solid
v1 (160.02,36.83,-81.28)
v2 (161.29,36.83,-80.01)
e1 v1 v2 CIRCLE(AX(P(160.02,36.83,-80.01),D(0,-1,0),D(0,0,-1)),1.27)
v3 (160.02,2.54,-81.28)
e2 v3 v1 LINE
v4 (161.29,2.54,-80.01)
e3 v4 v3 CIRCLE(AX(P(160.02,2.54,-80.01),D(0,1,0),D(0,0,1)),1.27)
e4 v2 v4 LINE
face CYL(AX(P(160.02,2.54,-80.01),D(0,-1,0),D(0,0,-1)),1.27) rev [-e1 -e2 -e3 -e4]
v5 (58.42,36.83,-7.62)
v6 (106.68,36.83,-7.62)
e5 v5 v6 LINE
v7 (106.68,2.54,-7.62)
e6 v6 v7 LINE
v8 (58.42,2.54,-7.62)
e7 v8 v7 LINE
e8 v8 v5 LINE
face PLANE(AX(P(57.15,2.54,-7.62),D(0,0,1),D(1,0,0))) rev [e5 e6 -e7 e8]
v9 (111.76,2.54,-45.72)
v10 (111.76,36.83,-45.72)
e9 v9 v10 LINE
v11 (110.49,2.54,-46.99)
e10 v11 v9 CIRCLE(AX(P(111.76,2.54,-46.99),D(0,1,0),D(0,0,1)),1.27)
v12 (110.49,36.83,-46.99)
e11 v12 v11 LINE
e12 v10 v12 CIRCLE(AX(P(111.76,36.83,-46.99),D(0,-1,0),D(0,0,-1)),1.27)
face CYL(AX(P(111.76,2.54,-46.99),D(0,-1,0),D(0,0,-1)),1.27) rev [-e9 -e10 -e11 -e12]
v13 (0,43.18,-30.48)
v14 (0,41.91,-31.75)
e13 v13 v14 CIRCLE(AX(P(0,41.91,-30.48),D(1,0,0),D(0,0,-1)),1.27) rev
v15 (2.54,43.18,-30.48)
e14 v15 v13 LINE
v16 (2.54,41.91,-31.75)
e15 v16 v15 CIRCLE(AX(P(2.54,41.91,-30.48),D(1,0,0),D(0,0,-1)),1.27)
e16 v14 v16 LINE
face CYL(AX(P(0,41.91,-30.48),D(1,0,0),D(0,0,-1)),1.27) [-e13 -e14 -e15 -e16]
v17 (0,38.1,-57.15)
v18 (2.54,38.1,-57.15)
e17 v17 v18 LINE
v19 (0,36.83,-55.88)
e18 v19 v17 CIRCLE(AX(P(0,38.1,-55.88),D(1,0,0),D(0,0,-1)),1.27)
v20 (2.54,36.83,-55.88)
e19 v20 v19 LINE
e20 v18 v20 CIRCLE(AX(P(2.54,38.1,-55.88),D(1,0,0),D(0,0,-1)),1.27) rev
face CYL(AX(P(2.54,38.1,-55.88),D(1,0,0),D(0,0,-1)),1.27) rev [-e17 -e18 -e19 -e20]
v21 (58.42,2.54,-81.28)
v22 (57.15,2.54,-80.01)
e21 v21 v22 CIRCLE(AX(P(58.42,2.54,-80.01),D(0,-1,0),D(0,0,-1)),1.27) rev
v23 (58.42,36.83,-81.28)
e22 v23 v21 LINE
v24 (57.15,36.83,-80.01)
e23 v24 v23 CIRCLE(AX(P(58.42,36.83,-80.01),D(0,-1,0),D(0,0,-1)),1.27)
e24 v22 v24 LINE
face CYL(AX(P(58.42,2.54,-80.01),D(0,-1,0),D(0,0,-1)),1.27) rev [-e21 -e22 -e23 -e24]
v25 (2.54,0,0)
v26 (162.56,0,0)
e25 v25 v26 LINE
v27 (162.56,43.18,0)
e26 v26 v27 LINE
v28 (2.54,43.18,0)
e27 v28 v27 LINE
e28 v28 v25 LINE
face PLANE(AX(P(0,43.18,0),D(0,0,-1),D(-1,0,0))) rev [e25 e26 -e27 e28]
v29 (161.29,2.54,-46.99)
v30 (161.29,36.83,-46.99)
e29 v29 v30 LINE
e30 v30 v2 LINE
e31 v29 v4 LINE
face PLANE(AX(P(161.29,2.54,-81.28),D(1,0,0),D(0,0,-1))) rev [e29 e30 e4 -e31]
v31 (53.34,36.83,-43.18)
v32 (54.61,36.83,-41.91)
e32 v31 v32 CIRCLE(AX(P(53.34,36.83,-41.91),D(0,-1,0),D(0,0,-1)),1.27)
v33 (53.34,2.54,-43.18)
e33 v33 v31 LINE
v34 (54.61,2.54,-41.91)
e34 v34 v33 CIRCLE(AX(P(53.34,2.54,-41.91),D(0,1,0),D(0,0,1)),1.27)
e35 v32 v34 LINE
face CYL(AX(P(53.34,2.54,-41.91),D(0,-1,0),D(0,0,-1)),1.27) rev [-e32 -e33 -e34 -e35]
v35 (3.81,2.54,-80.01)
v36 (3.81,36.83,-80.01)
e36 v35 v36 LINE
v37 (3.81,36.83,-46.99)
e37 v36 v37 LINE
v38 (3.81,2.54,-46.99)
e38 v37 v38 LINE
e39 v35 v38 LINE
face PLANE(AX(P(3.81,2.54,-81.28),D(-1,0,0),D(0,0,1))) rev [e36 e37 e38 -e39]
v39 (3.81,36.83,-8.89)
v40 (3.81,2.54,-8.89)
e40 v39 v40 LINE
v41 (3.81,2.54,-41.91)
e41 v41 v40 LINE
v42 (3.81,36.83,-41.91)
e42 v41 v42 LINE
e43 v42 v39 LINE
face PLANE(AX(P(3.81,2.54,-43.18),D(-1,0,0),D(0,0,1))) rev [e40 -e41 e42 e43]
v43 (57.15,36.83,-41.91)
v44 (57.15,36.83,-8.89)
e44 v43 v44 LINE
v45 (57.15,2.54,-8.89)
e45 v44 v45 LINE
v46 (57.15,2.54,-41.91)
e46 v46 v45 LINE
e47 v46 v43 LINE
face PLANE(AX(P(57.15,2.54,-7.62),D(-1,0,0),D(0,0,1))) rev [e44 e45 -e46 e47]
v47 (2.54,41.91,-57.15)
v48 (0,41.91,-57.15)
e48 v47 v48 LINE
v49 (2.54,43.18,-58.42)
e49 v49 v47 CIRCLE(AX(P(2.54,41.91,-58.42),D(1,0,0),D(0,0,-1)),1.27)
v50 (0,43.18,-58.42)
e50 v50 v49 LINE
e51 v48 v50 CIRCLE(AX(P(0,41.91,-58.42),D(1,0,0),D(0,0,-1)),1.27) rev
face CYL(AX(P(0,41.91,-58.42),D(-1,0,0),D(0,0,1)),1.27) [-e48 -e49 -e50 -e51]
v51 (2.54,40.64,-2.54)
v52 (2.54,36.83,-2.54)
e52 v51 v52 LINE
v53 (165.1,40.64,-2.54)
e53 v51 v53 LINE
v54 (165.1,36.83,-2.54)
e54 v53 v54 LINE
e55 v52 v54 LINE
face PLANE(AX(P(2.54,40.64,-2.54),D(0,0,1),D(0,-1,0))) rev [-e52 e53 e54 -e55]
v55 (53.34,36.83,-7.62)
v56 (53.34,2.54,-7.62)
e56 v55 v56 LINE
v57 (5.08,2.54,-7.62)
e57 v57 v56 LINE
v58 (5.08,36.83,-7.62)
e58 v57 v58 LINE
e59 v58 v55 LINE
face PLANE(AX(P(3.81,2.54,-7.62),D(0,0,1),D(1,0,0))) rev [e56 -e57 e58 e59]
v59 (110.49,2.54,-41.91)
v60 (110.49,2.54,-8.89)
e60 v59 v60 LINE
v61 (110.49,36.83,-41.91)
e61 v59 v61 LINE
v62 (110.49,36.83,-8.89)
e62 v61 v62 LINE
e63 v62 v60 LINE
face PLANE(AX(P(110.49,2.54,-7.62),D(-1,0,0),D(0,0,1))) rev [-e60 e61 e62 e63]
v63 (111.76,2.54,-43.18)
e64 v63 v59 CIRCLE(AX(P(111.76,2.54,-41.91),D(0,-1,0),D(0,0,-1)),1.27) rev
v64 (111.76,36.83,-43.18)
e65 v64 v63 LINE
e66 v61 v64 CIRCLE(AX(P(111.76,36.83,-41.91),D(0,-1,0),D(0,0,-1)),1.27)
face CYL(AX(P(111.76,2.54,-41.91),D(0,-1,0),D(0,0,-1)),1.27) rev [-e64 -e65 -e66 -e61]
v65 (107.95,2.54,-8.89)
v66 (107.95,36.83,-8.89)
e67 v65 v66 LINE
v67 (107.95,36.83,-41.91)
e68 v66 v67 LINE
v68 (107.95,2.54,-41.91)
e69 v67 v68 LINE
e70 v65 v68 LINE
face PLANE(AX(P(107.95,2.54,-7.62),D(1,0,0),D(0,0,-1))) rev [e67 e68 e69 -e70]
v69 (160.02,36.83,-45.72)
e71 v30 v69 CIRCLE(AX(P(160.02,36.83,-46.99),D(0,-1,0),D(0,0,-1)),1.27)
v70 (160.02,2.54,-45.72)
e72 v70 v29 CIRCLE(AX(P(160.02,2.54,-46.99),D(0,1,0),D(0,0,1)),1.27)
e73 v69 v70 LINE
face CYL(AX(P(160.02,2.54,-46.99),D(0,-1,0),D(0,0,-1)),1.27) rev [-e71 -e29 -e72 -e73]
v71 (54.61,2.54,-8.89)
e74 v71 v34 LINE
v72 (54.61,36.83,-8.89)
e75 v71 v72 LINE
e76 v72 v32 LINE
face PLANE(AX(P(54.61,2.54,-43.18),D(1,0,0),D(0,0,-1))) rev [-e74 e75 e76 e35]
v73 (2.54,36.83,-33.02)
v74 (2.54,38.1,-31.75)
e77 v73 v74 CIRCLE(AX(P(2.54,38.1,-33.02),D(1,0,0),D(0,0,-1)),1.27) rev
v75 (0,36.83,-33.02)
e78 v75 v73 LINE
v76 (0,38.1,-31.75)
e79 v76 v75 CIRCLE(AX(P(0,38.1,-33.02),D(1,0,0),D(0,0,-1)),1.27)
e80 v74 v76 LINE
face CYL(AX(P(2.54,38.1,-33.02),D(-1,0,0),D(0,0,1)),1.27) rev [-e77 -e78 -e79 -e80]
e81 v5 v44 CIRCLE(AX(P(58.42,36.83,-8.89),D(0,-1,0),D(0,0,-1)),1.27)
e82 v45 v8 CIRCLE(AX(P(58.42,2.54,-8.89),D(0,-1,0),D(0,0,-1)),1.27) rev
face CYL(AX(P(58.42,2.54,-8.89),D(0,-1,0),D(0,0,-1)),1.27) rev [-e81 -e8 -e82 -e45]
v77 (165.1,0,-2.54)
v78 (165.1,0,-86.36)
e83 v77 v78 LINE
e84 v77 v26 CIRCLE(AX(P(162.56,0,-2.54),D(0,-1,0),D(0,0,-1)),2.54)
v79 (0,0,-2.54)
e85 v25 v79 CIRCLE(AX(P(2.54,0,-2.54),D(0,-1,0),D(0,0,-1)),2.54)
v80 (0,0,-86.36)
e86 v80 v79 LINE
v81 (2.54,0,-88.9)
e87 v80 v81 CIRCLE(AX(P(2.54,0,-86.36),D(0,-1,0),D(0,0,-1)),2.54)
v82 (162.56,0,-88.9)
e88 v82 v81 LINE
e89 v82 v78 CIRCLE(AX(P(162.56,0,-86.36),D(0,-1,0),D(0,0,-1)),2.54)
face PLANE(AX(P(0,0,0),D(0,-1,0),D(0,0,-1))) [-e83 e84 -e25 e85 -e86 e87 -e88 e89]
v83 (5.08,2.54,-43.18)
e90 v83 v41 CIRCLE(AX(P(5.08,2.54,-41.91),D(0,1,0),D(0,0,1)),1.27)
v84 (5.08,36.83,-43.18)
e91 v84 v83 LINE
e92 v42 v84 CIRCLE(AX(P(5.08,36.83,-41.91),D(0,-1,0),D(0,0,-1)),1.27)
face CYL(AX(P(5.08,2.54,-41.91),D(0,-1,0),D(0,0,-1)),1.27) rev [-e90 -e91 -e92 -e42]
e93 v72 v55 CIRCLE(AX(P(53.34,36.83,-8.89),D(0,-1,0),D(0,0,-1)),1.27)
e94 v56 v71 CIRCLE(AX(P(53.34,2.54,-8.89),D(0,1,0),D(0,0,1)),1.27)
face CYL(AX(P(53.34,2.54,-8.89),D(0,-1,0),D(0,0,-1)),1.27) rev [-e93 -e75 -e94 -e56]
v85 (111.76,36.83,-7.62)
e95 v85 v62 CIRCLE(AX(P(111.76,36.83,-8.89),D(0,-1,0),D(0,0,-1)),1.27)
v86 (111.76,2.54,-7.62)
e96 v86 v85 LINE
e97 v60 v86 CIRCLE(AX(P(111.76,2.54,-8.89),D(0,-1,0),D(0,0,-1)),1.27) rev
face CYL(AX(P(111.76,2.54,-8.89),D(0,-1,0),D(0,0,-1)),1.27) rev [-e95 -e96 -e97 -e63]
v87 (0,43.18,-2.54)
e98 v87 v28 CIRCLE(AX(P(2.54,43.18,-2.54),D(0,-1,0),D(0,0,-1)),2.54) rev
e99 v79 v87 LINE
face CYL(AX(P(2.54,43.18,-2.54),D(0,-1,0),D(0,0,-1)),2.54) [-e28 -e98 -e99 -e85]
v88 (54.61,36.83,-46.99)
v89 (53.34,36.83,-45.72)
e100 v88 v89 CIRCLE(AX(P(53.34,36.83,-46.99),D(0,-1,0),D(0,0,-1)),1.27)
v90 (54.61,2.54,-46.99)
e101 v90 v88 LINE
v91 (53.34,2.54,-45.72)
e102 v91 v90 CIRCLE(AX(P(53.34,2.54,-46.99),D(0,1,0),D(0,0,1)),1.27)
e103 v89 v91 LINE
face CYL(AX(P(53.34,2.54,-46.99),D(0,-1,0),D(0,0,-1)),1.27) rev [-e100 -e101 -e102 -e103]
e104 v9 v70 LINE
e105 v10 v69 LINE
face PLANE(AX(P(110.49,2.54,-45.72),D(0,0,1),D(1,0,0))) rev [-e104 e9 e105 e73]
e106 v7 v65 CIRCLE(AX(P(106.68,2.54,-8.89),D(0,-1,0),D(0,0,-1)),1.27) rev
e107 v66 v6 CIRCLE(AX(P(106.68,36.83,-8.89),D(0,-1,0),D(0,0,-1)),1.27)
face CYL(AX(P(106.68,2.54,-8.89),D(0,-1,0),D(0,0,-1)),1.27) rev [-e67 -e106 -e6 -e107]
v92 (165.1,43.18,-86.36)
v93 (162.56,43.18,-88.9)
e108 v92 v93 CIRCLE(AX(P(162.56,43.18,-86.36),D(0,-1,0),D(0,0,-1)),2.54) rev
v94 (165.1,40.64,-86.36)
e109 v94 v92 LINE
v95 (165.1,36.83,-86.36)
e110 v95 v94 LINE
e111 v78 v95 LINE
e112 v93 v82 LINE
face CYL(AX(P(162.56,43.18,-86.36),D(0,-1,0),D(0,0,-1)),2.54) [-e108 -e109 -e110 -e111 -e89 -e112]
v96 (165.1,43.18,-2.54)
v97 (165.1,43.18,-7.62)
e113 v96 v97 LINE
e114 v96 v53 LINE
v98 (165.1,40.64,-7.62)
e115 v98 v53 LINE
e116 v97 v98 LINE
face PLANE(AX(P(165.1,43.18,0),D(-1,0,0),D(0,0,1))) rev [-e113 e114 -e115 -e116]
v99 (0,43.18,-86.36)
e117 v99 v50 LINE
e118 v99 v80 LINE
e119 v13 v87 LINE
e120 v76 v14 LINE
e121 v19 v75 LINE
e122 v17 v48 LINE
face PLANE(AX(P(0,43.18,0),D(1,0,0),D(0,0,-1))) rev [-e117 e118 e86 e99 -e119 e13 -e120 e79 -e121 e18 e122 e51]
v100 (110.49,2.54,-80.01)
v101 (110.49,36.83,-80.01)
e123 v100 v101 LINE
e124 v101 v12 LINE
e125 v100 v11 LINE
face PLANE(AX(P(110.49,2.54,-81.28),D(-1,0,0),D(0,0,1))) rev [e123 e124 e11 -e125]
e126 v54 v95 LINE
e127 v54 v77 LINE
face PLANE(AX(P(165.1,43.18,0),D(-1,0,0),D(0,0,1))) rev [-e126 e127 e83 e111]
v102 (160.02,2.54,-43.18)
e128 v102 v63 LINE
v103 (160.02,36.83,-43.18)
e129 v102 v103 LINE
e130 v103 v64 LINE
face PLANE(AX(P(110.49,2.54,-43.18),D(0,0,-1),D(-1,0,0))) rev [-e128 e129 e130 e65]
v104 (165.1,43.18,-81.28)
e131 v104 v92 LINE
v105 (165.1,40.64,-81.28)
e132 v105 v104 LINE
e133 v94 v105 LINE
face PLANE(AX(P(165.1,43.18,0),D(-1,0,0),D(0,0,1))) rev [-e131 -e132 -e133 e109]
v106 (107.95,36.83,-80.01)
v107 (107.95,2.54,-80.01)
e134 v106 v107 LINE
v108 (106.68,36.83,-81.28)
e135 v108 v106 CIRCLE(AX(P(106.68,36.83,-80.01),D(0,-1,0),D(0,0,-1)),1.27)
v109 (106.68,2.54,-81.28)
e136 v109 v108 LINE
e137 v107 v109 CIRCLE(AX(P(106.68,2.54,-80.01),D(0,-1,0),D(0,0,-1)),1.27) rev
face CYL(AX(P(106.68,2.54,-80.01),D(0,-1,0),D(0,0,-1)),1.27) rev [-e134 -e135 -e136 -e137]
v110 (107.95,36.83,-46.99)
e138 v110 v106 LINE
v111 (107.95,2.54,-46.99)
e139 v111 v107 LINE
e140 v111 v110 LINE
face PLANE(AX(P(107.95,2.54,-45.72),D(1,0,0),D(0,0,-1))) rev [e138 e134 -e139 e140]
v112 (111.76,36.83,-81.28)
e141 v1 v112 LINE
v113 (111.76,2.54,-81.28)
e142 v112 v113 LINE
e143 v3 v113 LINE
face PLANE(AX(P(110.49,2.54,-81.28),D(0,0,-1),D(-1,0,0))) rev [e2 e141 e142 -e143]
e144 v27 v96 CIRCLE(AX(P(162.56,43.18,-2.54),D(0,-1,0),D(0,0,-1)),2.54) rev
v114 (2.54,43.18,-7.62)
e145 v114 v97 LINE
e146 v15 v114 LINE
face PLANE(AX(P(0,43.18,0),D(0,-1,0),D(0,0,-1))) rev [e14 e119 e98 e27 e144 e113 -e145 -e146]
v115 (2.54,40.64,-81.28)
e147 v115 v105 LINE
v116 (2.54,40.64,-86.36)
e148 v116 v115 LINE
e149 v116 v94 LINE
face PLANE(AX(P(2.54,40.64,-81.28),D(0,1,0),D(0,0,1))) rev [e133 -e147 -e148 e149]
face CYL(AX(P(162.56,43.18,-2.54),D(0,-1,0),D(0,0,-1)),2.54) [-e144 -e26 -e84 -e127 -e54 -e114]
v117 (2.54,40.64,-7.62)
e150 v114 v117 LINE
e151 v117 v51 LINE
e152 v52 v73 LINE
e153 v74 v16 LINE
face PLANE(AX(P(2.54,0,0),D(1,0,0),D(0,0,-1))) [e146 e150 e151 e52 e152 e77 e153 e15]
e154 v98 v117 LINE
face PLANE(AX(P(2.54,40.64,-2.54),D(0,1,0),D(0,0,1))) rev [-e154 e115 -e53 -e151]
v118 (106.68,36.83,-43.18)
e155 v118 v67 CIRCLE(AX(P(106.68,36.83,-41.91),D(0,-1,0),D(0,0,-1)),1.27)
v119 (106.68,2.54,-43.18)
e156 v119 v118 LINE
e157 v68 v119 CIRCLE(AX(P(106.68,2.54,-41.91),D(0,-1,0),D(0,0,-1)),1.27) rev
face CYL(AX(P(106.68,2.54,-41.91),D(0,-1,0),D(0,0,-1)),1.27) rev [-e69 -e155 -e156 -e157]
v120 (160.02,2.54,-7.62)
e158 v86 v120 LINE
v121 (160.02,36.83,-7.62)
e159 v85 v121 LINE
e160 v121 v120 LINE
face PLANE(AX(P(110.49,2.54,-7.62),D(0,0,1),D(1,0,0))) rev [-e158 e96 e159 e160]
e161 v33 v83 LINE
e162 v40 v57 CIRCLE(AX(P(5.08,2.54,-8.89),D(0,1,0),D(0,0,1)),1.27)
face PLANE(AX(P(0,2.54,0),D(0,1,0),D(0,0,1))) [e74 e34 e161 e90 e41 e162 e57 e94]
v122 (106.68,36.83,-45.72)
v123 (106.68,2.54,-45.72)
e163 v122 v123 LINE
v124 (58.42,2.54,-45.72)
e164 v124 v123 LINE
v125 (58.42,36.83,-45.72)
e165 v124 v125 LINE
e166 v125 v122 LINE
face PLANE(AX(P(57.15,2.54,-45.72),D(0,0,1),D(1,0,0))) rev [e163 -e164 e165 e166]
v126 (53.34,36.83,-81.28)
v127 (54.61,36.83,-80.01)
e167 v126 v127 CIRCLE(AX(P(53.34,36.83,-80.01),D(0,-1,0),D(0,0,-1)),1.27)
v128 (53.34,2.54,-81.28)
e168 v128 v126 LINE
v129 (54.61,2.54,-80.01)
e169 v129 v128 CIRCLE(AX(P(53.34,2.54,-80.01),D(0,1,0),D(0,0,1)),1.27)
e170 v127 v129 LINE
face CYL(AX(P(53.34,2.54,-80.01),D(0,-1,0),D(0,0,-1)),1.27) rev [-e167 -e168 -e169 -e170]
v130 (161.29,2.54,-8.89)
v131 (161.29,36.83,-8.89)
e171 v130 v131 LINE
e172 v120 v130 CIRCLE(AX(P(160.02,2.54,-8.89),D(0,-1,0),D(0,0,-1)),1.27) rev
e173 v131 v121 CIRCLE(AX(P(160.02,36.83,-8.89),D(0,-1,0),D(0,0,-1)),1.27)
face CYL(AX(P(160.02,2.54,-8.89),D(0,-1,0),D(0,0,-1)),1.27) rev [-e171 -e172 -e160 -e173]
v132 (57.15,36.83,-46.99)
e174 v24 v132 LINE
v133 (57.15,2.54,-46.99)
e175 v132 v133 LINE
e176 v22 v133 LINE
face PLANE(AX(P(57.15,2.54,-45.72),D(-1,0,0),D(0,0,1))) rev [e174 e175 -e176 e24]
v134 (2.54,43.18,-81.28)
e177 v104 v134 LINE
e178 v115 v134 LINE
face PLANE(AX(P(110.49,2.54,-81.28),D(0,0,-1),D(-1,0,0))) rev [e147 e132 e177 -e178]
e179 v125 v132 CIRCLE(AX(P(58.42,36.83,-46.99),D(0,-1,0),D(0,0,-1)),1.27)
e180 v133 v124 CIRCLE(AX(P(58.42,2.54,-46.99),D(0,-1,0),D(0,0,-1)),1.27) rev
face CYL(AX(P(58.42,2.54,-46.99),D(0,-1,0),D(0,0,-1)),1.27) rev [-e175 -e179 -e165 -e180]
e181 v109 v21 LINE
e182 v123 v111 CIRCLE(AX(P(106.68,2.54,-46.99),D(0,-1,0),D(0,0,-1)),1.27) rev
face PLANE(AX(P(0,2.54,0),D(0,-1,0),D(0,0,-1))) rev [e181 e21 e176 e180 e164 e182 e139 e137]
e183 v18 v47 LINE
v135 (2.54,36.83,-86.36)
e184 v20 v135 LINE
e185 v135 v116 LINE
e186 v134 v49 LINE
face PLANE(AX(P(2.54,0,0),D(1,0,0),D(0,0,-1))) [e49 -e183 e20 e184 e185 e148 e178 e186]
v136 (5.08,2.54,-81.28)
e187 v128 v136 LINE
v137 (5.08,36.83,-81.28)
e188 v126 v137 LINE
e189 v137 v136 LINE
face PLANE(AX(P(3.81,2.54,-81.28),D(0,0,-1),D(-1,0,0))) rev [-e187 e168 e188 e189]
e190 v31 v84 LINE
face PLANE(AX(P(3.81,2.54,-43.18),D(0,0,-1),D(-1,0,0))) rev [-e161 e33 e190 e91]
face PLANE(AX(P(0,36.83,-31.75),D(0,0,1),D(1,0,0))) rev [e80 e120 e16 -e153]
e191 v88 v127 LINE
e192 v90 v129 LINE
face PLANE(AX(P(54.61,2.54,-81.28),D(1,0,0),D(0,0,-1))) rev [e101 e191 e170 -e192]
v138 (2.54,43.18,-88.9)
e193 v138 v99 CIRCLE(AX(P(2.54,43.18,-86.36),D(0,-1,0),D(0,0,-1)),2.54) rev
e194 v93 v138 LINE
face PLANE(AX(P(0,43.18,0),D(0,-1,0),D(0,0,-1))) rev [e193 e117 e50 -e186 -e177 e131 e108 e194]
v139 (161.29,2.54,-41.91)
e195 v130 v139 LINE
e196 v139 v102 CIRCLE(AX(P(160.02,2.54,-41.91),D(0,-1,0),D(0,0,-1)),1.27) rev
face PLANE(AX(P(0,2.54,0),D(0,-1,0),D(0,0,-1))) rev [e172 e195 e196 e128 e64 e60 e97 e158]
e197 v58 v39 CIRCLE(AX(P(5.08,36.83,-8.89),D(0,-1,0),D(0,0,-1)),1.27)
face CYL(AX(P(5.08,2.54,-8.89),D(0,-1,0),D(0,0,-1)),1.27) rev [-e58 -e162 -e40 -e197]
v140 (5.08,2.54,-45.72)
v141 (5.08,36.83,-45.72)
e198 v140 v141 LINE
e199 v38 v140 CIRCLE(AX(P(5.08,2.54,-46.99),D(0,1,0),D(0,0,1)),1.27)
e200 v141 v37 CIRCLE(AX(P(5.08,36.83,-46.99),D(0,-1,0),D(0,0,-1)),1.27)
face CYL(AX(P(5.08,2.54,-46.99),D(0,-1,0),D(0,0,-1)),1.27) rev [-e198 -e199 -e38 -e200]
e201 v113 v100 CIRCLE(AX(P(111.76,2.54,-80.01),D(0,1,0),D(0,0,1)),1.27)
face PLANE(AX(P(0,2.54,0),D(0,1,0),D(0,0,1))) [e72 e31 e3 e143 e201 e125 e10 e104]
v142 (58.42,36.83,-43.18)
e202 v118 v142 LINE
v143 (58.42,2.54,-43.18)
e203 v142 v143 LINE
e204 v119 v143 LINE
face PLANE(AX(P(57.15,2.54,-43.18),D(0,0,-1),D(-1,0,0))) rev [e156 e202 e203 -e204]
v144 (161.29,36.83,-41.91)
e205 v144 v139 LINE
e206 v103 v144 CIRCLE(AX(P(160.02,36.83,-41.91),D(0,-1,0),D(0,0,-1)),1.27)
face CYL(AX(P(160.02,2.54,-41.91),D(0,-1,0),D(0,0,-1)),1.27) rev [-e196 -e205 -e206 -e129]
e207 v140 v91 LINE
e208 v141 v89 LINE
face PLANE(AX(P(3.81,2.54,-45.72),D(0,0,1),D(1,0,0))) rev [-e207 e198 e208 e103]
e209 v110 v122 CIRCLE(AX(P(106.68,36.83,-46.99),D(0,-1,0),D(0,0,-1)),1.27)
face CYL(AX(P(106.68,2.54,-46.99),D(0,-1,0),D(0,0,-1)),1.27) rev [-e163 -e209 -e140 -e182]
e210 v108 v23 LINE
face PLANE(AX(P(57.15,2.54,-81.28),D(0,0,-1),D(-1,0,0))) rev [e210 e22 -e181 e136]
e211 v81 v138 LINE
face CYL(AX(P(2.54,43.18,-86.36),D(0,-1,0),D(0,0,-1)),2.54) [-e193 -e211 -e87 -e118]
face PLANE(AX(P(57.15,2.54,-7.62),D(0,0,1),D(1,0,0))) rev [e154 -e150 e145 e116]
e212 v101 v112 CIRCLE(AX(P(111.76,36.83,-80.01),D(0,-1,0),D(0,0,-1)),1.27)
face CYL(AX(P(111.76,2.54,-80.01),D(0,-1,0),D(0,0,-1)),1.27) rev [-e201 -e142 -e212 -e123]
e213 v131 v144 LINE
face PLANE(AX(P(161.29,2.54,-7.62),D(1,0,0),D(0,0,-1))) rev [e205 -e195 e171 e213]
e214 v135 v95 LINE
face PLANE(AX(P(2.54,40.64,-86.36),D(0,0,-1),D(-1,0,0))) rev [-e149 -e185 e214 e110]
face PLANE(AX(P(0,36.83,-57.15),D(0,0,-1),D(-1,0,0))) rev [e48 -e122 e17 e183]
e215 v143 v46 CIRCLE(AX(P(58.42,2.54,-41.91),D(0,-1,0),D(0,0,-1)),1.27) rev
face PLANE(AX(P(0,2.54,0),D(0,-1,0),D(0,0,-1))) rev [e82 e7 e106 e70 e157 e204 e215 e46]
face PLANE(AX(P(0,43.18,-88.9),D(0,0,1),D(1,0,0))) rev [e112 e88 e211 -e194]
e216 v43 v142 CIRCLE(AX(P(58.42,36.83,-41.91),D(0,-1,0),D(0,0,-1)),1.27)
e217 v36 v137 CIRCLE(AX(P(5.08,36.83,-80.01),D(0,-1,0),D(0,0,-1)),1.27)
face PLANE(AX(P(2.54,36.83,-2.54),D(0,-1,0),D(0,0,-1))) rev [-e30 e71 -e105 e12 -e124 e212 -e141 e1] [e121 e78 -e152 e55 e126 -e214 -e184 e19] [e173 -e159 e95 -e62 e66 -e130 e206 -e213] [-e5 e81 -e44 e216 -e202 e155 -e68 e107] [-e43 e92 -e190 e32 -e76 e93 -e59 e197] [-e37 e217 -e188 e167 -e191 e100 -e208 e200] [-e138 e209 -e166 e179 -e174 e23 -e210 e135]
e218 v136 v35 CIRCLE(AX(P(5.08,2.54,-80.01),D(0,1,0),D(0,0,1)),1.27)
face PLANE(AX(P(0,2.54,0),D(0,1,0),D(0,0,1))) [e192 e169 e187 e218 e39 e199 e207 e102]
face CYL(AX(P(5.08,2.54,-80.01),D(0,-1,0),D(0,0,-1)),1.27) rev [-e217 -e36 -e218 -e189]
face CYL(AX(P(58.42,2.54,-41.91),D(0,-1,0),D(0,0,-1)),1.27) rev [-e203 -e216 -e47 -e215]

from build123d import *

# Parameters (mm, degrees)
SKETCH1_W           = 165.1
SKETCH1_H           = 88.9
BOSS_EXTRUDE1_DEPTH = 43.18
SKETCH2_W           = 50.8
SKETCH2_H           = 35.56
CUT_EXTRUDE1_DEPTH  = 40.64
CUT_EXTRUDE2_DEPTH  = 162.56
SKETCH4_W           = 2.54
SKETCH4_H           = 25.4
CUT_EXTRUDE3_DEPTH  = 6.35
FILLET1_START       = -1
FILLET1_DEPTH       = 45
FILLET2_R           = 1.27


with BuildPart() as part:
    # Sketch1 → Boss-Extrude1 (new body)
    with BuildSketch(Plane(origin=(0, 0, 0), x_dir=(1, 0, 0), z_dir=(0, 1, 0))):
        with Locations((82.55, 44.45)):
            Rectangle(SKETCH1_W, SKETCH1_H)
    extrude(amount=BOSS_EXTRUDE1_DEPTH)

    # Sketch2 → Cut-Extrude1 (cut)
    with BuildSketch(Plane(origin=(0, 43.18, 0), x_dir=(1, 0, 0), z_dir=(0, 1, 0))):
        with Locations((29.21, 63.5)):
            Rectangle(SKETCH2_W, SKETCH2_H)
        with Locations((29.21, 25.4)):
            Rectangle(SKETCH2_W, SKETCH2_H)
        with Locations((82.55, 63.5)):
            Rectangle(SKETCH2_W, SKETCH2_H)
        with Locations((135.89, 63.5)):
            Rectangle(SKETCH2_W, SKETCH2_H)
        with Locations((135.89, 25.4)):
            Rectangle(SKETCH2_W, SKETCH2_H)
        with Locations((82.55, 25.4)):
            Rectangle(SKETCH2_W, SKETCH2_H)
    extrude(amount=-CUT_EXTRUDE1_DEPTH, mode=Mode.SUBTRACT)

    # Sketch3 → Cut-Extrude2 (cut)
    with BuildSketch(Plane(origin=(165.1, 0, 0), x_dir=(0, 0, -1), z_dir=(1, 0, 0))):
        Polygon((2.54, 40.64), (7.62, 40.64), (7.62, 43.18), (81.28, 43.18), (81.28, 40.64), (86.36, 40.64), (86.36, 36.83), (2.54, 36.83), align=None)
    extrude(amount=-CUT_EXTRUDE2_DEPTH, mode=Mode.SUBTRACT)

    # Sketch4 → Cut-Extrude3 (cut)
    with BuildSketch(Plane(origin=(0, 43.18, 0), x_dir=(1, 0, 0), z_dir=(0, 1, 0))):
        with Locations((1.27, 44.45)):
            Rectangle(SKETCH4_W, SKETCH4_H)
    extrude(amount=-CUT_EXTRUDE3_DEPTH, mode=Mode.SUBTRACT)

    # Fillet1: read off the stored shape, not the designer's step
    # Fillet1 outline → Fillet1 (cut)
    with BuildSketch(Plane(origin=(0, 0, 0), x_dir=(1, 0, 0), z_dir=(0, 1, 0)).offset(FILLET1_START)):
        with BuildLine():
            Line((0, 88.9), (0, 86.36))
            ThreePointArc((0, 86.36), (0.743948776, 88.156051224), (2.54, 88.9))
            Line((2.54, 88.9), (0, 88.9))
        make_face()
        with BuildLine():
            ThreePointArc((2.54, 0), (0.743948776, 0.743948776), (0, 2.54))
            Line((0, 2.54), (0, 0))
            Line((0, 0), (2.54, 0))
        make_face()
        with BuildLine():
            Line((165.1, 88.9), (162.56, 88.9))
            ThreePointArc((162.56, 88.9), (164.356051224, 88.156051224), (165.1, 86.36))
            Line((165.1, 86.36), (165.1, 88.9))
        make_face()
        with BuildLine():
            ThreePointArc((165.1, 2.54), (164.356051224, 0.743948776), (162.56, 0))
            Line((162.56, 0), (165.1, 0))
            Line((165.1, 0), (165.1, 2.54))
        make_face()
    extrude(amount=FILLET1_DEPTH, mode=Mode.SUBTRACT)

    # Fillet2
    fillet2_edges = [part.edges().sort_by_distance(p)[0] for p in [
        (1.27, 36.83, -57.15),
        (1.27, 36.83, -31.75),
        (1.27, 43.18, -31.75),
        (1.27, 43.18, -57.15),
        (57.15, 19.685, -7.62),
        (57.15, 19.685, -43.18),
        (107.95, 19.685, -43.18),
        (107.95, 19.685, -7.62),
        (110.49, 19.685, -45.72),
        (110.49, 19.685, -81.28),
        (161.29, 19.685, -81.28),
        (161.29, 19.685, -45.72),
        (57.15, 19.685, -45.72),
        (57.15, 19.685, -81.28),
        (107.95, 19.685, -81.28),
        (107.95, 19.685, -45.72),
        (3.81, 19.685, -7.62),
        (3.81, 19.685, -43.18),
        (54.61, 19.685, -43.18),
        (54.61, 19.685, -7.62),
        (110.49, 19.685, -7.62),
        (110.49, 19.685, -43.18),
        (161.29, 19.685, -43.18),
        (161.29, 19.685, -7.62),
        (3.81, 19.685, -45.72),
        (3.81, 19.685, -81.28),
        (54.61, 19.685, -81.28),
        (54.61, 19.685, -45.72),
    ]]
    fillet(fillet2_edges, radius=FILLET2_R)


solid = part.part
